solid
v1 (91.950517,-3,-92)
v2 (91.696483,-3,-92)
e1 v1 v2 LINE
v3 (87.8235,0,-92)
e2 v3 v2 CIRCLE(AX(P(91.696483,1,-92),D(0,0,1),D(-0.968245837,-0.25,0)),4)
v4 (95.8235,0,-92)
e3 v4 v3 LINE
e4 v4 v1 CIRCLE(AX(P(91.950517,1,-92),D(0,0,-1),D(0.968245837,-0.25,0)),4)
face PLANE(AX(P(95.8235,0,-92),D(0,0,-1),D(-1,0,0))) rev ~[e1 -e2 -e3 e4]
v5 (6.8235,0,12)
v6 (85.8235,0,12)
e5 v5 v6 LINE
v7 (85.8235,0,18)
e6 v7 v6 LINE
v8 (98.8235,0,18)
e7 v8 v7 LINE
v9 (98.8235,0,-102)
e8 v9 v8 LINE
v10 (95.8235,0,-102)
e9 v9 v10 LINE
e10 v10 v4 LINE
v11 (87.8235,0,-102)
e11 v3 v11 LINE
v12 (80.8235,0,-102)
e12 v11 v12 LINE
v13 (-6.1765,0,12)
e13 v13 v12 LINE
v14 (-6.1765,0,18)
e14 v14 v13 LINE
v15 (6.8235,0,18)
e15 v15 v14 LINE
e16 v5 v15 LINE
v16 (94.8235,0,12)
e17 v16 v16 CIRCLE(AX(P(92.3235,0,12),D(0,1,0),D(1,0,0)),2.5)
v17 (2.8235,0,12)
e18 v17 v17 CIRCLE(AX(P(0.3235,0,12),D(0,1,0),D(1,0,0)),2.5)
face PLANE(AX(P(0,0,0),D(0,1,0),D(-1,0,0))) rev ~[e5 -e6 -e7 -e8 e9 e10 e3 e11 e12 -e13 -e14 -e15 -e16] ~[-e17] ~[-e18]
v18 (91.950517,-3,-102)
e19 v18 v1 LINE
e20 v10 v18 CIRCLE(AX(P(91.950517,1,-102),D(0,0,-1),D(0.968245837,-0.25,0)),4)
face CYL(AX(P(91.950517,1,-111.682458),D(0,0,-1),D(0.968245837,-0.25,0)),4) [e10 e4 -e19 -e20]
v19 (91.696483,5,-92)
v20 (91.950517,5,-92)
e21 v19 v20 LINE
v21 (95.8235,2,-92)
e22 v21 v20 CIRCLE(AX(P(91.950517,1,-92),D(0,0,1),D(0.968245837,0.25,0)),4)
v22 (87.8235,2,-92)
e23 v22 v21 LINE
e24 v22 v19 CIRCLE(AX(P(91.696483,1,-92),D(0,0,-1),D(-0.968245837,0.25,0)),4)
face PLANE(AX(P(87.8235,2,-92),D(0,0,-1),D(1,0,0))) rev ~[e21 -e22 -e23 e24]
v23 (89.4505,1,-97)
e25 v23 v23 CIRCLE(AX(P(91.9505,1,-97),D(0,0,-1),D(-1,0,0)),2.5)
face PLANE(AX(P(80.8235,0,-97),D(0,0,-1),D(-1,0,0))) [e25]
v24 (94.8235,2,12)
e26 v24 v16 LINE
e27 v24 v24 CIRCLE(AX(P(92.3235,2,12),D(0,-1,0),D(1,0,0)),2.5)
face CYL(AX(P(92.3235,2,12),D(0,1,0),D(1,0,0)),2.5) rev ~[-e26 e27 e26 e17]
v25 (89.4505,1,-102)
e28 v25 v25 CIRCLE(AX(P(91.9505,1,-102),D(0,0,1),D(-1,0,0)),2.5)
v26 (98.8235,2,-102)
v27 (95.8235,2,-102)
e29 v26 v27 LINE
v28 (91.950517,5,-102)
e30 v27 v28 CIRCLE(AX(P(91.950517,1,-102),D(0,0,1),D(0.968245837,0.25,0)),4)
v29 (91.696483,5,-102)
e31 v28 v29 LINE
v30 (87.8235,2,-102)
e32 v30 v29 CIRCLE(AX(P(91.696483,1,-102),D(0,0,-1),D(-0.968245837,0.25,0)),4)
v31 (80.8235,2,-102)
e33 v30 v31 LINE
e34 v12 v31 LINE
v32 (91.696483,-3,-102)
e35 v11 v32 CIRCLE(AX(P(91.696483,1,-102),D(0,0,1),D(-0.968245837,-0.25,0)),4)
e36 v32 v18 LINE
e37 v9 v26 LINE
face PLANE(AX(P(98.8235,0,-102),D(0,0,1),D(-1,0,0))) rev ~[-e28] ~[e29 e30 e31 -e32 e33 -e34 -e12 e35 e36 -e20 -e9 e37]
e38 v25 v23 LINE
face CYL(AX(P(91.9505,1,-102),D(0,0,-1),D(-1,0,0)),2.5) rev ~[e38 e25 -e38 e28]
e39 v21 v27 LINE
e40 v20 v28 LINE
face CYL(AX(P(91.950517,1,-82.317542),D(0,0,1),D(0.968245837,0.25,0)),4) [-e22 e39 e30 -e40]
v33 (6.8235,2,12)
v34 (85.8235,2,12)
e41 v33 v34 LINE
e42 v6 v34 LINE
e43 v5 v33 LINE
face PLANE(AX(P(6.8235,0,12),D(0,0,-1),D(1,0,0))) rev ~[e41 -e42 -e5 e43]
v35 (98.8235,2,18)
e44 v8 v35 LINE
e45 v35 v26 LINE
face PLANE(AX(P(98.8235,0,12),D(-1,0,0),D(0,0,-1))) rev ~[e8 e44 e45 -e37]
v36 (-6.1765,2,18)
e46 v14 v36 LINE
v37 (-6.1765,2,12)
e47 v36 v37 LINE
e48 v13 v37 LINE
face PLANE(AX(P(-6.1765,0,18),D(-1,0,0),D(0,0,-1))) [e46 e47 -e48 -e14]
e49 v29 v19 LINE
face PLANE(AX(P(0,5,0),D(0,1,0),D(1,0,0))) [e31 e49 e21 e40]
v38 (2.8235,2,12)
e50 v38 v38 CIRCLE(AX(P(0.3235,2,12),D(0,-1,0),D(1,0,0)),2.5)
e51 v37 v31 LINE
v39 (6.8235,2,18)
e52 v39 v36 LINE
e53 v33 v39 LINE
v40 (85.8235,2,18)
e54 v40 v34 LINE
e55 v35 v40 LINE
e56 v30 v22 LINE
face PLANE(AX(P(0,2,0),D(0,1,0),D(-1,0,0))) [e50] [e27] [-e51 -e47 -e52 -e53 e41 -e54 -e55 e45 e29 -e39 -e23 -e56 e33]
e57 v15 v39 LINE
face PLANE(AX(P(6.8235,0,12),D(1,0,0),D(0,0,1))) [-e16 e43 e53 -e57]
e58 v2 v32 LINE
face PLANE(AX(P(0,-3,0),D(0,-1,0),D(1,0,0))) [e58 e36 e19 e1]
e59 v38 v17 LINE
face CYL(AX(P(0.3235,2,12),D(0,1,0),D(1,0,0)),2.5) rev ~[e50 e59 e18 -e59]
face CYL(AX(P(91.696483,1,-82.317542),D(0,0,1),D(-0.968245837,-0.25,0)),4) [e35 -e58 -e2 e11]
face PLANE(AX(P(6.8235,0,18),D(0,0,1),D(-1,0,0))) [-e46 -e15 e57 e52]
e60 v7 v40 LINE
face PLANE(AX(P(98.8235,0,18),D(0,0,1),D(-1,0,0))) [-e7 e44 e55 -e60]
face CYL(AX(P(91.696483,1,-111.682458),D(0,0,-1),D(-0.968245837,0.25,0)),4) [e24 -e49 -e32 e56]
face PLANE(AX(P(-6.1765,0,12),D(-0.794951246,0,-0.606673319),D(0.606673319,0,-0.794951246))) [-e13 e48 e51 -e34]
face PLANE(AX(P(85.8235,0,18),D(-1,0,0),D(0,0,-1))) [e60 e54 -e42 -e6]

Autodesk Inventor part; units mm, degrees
ref_plane "YZ Plane" through (0, 0, 0) normal (1, 0, 0) x (0, 1, 0)
ref_plane "XZ Plane" through (0, 0, 0) normal (0, 1, 0) x (-1, 0, 0)
ref_plane "XY Plane" through (0, 0, 0) normal (0, 0, 1) x (1, 0, 0)
sketch "Sketch1" plane through (0, 0, 0) normal (0, 1, 0) x (-1, 0, 0)
  line L0 (6.1765, 12) -> (-98.8235, 12)
  line L1 (-98.8235, 12) -> (-98.8235, -102)
  line L2 (-6.8235, 12) -> (-6.8235, 18)
  line L3 (-6.8235, 18) -> (6.1765, 18)
  line L4 (6.1765, 18) -> (6.1765, 12)
  line L5 (-98.8235, 12) -> (-98.8235, 18)
  line L6 (-98.8235, 18) -> (-85.8235, 18)
  line L7 (-85.8235, 18) -> (-85.8235, 12)
  line L8 (-98.8235, -102) -> (-85.8235, -87.8857)
  line L9 (-6.8235, -2.1143) -> (6.1765, 12)
  line L10 (-98.8235, -102) -> (-80.8235, -102)
  line L11 (6.1765, 12) -> (-80.8235, -102)
  point P0 (0, 0)
  point P1 (-96.8235, 18)
  point P2 (-96.8235, 18)
  dimension "d0" = 114
  dimension "d1" = 105
  dimension "d2" = 13
  dimension "d3" = 6
  dimension "d4" = 13
  dimension "d5" = 6
  dimension "d6" = 18
extrude "Extrusion1" add sketch "Sketch1" along normal blind 2
sketch "Sketch2" plane through (0, 2, 0) normal (0, 1, 0) x (1, 0, 0)
  line L0 (98.8235, 102) -> (80.8235, 102) projected
  line L1 (95.8235, 102) -> (87.8235, 102)
  line L2 (87.8235, 102) -> (87.8235, 92)
  line L3 (87.8235, 92) -> (95.8235, 92)
  line L4 (95.8235, 92) -> (95.8235, 102)
  line L5 (98.8235, -18) -> (98.8235, 102) projected
  point P0 (0, 0)
  dimension "d9" = 10
  dimension "d10" = 8
  dimension "d11" = 3
extrude "Extrusion2" add sketch "Sketch2" along normal blind 3
fillet "Fillet1" radius 4 2 edges at (87.8235, 5, -97) (95.8235, 5, -97)
sketch "Sketch3" plane through (0, 0, 0) normal (0, -1, 0) x (1, 0, 0)
  line L0 (87.8235, -102) -> (80.8235, -102) projected
  line L1 (87.8235, -102) -> (95.8235, -102)
  line L2 (95.8235, -102) -> (95.8235, -92)
  line L3 (95.8235, -92) -> (87.8235, -92)
  line L4 (87.8235, -92) -> (87.8235, -102)
  line L5 (98.8235, 18) -> (98.8235, -102) projected
  point P0 (0, 0)
  dimension "d16" = 10
  dimension "d17" = 8
  dimension "d18" = 3
extrude "Extrusion3" add sketch "Sketch3" along normal blind 3
fillet "Fillet3" radius 4 2 edges at (87.8235, -3, -97) (95.8235, -3, -97)
sketch "Sketch4" plane through (80.8235, 0, -102) normal (0, 0, -1) x (-1, 0, 0)
  arc A0 (-15, 0) -> (-11.127, -3) centre (-11.127, 1) ccw projected
  line L0 (-11.127, 4.8105) -> (-11.127, -3)
  circle A1 centre (-11.127, 1) radius 2.5
  point P0 (80.8235, 0)
  dimension "d25" = 5
extrude "Extrusion4" cut sketch "Sketch4" against normal blind 5
sketch "Sketch5" plane through (0, 2, 0) normal (0, 1, 0) x (1, 0, 0)
  line L0 (85.8235, -12) -> (85.8235, -18) projected
  line L1 (85.8235, -12) -> (98.8235, -12)
  line L2 (98.8235, -18) -> (98.8235, 102) projected
  circle A0 centre (92.3235, -12) radius 2.5
  point P0 (0, 0)
  dimension "d26" = 5
extrude "Extrusion5" cut sketch "Sketch5" against normal blind 2
sketch "Sketch6" plane through (0, 2, 0) normal (0, 1, 0) x (1, 0, 0)
  line L0 (-6.1765, -12) -> (-6.1765, -18) projected
  line L1 (6.8235, -18) -> (6.8235, -12) projected
  line L2 (-6.1765, -12) -> (6.8235, -12)
  circle A0 centre (0.3235, -12) radius 2.5
  point P0 (0, 0)
  dimension "d29" = 5
  dimension "d32" = 6.5
  dimension "d33" = 6
extrude "Extrusion6" cut sketch "Sketch6" against normal blind 2
equation "\"d23\" = d22"
equation "\"d22\" = 5"
properties part number "Triangle"
